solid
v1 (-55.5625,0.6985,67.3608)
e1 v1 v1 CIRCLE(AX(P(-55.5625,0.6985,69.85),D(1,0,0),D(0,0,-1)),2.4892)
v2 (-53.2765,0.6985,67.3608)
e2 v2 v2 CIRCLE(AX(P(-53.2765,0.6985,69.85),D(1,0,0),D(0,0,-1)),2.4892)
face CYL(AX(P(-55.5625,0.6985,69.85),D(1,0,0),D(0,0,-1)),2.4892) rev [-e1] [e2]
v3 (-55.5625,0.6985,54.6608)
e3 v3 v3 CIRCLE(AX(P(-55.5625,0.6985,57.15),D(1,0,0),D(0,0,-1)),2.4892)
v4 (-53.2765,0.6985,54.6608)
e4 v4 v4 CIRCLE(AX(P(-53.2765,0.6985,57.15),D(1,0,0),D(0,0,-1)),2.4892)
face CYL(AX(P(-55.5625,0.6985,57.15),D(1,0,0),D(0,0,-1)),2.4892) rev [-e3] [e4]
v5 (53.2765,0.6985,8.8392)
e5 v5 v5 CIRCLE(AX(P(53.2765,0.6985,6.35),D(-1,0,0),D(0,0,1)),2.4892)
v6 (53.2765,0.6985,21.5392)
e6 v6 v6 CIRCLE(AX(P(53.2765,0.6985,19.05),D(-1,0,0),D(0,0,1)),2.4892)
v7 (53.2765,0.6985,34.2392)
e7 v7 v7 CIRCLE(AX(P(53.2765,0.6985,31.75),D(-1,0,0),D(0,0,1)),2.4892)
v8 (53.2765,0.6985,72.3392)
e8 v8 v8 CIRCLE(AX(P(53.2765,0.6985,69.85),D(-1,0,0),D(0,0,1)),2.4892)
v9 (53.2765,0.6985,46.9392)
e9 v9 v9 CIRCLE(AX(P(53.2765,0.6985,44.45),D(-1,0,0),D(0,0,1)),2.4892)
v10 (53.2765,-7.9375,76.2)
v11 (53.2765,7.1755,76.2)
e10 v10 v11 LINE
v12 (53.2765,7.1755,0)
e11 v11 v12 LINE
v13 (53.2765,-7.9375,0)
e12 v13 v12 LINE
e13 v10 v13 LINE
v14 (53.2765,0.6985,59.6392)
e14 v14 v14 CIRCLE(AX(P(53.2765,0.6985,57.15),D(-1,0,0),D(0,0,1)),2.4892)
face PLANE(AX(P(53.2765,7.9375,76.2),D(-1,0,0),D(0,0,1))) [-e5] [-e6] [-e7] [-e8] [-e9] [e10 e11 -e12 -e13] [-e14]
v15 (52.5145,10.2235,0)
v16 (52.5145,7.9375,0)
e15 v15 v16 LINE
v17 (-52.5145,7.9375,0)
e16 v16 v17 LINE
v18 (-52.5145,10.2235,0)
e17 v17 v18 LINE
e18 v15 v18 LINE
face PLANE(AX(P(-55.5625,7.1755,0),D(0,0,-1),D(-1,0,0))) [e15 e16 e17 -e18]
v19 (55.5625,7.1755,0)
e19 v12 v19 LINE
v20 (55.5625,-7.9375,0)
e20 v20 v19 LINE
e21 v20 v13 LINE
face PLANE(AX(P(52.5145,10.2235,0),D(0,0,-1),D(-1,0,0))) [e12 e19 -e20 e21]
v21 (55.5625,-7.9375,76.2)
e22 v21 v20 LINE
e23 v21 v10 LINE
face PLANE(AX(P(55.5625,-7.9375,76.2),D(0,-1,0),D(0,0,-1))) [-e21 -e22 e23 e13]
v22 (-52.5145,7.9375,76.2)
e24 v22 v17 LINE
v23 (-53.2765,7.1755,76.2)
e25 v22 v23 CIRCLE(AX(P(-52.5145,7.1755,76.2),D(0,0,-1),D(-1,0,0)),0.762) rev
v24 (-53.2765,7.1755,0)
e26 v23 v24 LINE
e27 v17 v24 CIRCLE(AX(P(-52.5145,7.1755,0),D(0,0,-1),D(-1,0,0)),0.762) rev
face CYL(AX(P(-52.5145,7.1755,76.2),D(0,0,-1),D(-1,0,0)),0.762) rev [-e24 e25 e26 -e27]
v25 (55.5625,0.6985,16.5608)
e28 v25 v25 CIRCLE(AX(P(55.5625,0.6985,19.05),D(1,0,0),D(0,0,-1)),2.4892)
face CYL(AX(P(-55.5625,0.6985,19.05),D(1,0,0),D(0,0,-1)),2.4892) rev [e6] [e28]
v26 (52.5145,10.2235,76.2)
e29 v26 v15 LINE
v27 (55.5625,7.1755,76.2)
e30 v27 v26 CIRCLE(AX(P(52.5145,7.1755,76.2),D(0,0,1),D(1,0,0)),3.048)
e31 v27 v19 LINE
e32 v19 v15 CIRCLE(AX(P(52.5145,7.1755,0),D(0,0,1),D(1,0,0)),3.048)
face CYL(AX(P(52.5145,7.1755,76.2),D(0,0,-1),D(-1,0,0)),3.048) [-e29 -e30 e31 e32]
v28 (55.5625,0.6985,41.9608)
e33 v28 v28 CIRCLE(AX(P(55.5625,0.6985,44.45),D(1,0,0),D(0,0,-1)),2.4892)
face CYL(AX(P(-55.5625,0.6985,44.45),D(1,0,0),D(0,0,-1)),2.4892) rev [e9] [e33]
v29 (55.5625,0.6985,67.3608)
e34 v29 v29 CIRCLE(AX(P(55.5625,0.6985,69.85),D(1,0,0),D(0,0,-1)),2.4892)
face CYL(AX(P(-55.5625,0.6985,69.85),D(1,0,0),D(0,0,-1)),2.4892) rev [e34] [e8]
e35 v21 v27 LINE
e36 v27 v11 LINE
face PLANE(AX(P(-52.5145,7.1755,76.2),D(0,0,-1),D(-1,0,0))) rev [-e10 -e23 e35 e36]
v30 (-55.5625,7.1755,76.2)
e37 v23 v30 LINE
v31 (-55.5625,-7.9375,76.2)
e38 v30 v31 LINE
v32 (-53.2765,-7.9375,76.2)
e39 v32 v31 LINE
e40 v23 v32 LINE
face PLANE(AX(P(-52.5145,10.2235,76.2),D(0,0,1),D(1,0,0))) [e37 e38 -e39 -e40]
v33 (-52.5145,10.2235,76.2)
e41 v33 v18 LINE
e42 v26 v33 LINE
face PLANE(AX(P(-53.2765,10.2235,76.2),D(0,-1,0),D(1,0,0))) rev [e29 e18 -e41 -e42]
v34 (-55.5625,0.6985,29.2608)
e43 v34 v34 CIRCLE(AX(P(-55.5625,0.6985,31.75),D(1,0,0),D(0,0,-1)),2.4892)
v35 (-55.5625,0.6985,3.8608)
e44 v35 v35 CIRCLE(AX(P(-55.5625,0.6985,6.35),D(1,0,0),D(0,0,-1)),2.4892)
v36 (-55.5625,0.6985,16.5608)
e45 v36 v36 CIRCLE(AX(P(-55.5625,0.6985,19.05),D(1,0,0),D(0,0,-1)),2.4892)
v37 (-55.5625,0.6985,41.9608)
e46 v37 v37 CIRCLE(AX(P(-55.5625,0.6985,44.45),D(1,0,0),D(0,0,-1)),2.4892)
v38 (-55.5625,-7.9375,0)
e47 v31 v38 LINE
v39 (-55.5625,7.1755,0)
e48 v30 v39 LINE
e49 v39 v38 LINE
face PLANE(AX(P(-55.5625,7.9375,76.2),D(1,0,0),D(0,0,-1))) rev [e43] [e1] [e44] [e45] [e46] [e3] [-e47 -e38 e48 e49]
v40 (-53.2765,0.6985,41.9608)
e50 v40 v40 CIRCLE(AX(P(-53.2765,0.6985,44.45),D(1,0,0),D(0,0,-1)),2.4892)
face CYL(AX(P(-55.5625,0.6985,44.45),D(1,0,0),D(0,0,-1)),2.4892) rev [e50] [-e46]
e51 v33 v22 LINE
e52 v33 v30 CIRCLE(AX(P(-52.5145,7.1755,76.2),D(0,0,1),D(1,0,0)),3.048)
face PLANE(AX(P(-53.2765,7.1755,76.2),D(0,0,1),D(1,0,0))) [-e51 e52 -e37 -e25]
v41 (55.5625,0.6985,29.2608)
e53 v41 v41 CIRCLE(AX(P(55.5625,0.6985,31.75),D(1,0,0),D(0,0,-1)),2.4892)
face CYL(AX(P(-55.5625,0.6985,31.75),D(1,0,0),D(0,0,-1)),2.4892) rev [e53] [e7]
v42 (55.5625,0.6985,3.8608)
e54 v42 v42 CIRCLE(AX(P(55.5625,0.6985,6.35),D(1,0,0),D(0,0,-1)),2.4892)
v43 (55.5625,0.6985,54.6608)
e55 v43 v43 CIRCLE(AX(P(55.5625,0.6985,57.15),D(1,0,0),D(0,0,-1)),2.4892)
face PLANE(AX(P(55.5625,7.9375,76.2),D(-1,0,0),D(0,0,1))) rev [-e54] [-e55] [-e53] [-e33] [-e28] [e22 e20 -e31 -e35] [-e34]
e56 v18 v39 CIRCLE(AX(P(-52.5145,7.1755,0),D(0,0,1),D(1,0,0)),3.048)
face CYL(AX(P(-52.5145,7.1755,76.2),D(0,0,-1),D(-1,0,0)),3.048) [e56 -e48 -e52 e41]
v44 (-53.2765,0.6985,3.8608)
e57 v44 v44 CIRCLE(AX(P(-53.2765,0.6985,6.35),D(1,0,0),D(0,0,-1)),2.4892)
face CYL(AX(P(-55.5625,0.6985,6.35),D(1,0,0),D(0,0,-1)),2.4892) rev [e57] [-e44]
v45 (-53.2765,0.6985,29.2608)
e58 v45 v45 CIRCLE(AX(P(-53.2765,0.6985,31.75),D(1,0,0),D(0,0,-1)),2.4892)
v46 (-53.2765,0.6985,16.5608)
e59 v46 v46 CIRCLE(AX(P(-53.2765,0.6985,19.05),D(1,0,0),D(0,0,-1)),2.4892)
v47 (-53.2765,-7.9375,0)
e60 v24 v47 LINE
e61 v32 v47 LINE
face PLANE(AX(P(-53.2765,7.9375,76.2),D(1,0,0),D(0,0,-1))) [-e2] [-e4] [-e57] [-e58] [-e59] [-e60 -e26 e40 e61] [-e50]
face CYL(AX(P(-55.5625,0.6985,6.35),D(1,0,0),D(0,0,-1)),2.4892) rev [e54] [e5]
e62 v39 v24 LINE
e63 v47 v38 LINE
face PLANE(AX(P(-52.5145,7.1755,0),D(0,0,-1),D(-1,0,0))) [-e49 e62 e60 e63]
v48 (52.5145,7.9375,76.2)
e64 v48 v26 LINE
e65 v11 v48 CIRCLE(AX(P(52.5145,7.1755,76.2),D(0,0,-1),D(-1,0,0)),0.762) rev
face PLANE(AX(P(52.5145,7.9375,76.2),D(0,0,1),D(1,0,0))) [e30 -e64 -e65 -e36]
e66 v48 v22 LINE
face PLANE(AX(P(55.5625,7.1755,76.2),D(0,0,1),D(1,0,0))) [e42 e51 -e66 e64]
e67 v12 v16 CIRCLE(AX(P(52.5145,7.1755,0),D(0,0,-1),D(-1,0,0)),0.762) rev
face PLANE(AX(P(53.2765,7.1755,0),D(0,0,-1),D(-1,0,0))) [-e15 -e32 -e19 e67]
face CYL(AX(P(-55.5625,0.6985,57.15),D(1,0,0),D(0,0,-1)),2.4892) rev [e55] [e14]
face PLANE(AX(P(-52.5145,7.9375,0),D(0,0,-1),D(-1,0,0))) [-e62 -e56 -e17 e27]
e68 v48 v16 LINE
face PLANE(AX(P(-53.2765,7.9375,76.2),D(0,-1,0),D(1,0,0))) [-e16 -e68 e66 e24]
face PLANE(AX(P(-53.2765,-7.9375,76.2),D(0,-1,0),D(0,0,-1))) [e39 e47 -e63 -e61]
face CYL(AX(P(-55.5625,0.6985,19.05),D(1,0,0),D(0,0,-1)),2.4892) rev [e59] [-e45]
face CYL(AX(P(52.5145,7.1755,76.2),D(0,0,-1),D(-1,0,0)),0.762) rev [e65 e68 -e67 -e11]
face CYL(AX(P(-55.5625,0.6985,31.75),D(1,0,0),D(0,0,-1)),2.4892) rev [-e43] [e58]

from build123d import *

# Parameters (mm, degrees)
BASE_FLANGE1_DEPTH      = 76.2
CUT_EXTRUDE1_DEPTH      = 95.858586108
CUT_EXTRUDE1_DEPTH_BACK = 95.858586108
SKETCH3_R               = 2.4892


# Sheet-metal steps are written as plain solids
with BuildPart() as part:
    # Sketch1 → Base-Flange1 (new body)
    with BuildSketch(Plane.XY):
        with BuildLine():
            Line((-53.2765, -7.9375), (-53.2765, 7.1755))
            ThreePointArc((-53.2765, 7.1755), (-53.053315367, 7.714315367), (-52.5145, 7.9375))
            Line((-52.5145, 7.9375), (52.5145, 7.9375))
            ThreePointArc((52.5145, 7.9375), (53.053315367, 7.714315367), (53.2765, 7.1755))
            Line((53.2765, 7.1755), (53.2765, -7.9375))
            Line((53.2765, -7.9375), (55.5625, -7.9375))
            Line((55.5625, -7.9375), (55.5625, 7.1755))
            ThreePointArc((55.5625, 7.1755), (54.669761469, 9.330761469), (52.5145, 10.2235))
            Line((52.5145, 10.2235), (-52.5145, 10.2235))
            ThreePointArc((-52.5145, 10.2235), (-54.669761469, 9.330761469), (-55.5625, 7.1755))
            Line((-55.5625, 7.1755), (-55.5625, -7.9375))
            Line((-55.5625, -7.9375), (-53.2765, -7.9375))
        make_face()
    extrude(amount=BASE_FLANGE1_DEPTH)

    # Sketch3 → Cut-Extrude1 (cut, two sides: drawn at the far end of the back side and taken through both)
    with BuildSketch(Plane(origin=(0, 0, 0), x_dir=(0, 0, -1), z_dir=(1, 0, 0)).offset(-CUT_EXTRUDE1_DEPTH_BACK)):
        with Locations((-6.35, 0.6985)):
            Circle(SKETCH3_R)
        with Locations((-19.05, 0.6985)):
            Circle(SKETCH3_R)
        with Locations((-31.75, 0.6985)):
            Circle(SKETCH3_R)
        with Locations((-44.45, 0.6985)):
            Circle(SKETCH3_R)
        with Locations((-57.15, 0.6985)):
            Circle(SKETCH3_R)
        with Locations((-69.85, 0.6985)):
            Circle(SKETCH3_R)
    extrude(amount=CUT_EXTRUDE1_DEPTH + CUT_EXTRUDE1_DEPTH_BACK, mode=Mode.SUBTRACT)


solid = part.part
